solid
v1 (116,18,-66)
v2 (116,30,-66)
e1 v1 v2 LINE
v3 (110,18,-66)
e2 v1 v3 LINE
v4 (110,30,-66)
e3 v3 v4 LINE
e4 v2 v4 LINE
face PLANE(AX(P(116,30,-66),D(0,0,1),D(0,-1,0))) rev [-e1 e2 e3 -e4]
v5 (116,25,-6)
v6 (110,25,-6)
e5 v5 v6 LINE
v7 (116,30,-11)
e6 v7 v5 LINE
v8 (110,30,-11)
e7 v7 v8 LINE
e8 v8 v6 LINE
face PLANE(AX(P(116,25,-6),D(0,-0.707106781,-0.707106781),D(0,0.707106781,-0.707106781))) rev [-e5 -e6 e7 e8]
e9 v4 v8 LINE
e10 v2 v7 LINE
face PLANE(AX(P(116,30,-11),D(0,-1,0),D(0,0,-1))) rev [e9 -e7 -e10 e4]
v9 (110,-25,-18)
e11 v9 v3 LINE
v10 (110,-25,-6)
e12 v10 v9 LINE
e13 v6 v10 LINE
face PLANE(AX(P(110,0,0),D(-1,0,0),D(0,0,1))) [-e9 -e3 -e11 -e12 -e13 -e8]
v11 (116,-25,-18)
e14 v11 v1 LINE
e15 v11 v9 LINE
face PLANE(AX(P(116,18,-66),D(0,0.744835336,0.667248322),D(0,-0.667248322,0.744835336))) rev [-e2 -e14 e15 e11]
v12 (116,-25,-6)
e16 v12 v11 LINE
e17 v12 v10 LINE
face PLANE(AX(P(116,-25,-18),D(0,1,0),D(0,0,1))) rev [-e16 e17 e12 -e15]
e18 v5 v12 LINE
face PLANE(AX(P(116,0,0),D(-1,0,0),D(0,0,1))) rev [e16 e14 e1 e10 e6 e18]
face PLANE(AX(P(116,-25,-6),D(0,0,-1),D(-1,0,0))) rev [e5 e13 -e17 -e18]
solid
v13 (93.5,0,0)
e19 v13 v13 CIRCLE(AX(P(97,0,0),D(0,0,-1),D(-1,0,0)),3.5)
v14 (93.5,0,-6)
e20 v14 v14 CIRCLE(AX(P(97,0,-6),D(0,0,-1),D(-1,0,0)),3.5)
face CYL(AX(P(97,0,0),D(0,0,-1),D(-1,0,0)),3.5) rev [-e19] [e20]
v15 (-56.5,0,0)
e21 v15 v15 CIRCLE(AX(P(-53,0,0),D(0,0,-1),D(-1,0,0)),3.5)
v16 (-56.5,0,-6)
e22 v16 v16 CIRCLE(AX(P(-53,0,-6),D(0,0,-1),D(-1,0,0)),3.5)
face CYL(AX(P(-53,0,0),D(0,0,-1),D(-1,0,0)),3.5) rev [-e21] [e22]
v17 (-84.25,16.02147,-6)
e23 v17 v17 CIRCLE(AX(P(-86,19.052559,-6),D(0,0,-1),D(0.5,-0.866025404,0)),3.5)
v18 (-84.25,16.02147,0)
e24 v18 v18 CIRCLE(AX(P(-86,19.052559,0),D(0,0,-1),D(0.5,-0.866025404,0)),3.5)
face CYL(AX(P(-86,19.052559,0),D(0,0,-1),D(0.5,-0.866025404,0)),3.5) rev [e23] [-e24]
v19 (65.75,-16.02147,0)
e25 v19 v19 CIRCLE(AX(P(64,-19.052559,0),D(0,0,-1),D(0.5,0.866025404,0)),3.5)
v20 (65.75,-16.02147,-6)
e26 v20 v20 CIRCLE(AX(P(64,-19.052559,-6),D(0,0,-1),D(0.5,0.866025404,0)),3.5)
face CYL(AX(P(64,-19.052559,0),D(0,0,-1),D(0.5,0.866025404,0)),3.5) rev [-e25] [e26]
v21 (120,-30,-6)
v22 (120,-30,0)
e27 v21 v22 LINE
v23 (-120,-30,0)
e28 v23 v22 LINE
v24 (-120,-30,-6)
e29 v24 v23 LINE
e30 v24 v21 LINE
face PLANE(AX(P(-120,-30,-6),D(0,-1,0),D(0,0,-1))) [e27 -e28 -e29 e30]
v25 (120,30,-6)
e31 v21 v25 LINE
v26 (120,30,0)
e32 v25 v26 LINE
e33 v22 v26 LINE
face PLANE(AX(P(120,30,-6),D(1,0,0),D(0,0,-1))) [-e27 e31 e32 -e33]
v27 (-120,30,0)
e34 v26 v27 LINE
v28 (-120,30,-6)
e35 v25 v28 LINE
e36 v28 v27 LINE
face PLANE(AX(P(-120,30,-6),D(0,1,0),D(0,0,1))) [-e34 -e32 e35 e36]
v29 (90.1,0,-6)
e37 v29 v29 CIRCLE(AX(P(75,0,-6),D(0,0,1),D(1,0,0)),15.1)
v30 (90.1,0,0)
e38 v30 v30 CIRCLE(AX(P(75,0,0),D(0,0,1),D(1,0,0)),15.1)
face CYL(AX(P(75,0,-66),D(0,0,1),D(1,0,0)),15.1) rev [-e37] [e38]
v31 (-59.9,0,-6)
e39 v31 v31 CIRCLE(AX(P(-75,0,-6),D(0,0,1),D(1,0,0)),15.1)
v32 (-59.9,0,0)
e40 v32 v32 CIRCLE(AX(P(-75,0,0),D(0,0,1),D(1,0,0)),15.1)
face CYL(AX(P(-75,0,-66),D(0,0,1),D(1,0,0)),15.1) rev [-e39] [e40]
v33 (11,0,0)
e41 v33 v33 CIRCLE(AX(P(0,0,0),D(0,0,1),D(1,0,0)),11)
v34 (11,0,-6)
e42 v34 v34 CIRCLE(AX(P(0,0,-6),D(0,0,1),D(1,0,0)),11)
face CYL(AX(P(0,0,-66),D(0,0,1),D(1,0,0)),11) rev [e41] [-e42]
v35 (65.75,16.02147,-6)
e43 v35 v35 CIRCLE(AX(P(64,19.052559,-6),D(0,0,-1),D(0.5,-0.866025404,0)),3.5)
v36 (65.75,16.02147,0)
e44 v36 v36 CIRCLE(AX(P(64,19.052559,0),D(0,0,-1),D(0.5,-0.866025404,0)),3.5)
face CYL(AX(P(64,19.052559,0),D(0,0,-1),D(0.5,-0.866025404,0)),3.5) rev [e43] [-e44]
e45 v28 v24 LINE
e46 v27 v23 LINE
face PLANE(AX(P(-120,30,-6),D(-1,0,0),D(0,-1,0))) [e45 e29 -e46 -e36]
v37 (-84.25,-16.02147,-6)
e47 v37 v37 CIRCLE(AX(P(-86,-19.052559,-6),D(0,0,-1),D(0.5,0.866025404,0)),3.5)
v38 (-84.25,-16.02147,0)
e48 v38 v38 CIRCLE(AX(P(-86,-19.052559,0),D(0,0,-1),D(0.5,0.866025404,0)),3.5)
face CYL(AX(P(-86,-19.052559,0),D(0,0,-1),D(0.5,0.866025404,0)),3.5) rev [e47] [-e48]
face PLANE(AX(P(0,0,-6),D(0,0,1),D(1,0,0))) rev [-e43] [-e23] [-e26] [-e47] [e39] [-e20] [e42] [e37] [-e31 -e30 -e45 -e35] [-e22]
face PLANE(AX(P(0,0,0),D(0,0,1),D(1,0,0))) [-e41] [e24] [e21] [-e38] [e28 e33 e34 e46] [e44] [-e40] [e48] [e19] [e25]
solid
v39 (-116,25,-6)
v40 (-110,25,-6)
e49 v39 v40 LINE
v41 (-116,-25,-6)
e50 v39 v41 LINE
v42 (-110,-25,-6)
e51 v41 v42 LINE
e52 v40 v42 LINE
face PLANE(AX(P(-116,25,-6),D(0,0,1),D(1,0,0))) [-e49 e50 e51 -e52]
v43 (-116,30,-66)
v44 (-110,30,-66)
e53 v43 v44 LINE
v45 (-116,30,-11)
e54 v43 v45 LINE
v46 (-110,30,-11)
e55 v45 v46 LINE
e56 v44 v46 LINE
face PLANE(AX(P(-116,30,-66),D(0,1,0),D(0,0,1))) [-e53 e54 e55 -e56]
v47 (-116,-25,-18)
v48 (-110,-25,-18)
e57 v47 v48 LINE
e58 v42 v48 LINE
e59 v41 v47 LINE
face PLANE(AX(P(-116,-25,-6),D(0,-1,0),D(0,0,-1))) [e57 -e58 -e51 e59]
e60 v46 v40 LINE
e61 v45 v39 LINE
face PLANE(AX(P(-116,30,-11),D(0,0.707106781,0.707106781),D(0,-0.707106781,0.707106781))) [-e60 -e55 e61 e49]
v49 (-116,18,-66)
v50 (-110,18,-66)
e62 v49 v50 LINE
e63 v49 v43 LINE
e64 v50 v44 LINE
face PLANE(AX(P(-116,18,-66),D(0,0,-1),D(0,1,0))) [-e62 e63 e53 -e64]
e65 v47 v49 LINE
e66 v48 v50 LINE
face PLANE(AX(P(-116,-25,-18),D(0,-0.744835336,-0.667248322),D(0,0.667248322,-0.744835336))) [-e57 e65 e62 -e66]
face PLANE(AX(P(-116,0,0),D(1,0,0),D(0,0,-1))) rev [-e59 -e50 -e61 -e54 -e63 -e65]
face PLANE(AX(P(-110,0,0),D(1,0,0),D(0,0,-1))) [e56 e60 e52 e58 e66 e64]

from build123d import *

# Parameters (mm, degrees)
SKETCH1_W          = 240
SKETCH1_H          = 60
BASE_FLANGE1_DEPTH = 6
BASE_FLANGE2_DEPTH = 6
BASE_FLANGE3_DEPTH = 6
SKETCH12_R         = 11
CUT_EXTRUDE1_DEPTH = 141.199857347
SKETCH13_R         = 15.1
CUT_EXTRUDE2_DEPTH = 141.199857347
SKETCH14_R         = 3.5
CUT_EXTRUDE3_DEPTH = 138.477270849
CIRPATTERN1_COUNT  = 3
SKETCH15_R         = 3.5
CUT_EXTRUDE4_DEPTH = 138.477270849
CIRPATTERN2_COUNT  = 3


# Sheet-metal steps are written as plain solids
with BuildPart() as part:
    # Sketch1 → Base-Flange1 (new body)
    with BuildSketch(Plane.XY):
        Rectangle(SKETCH1_W, SKETCH1_H)
    extrude(amount=-BASE_FLANGE1_DEPTH)

    # Sketch12 → Cut-Extrude1 (cut, through all)
    with BuildSketch(Plane.XY):
        Circle(SKETCH12_R)
    extrude(amount=-CUT_EXTRUDE1_DEPTH, mode=Mode.SUBTRACT)

    # Sketch13 → Cut-Extrude2 (cut, through all)
    with BuildSketch(Plane.XY):
        with Locations((-75, 0)):
            Circle(SKETCH13_R)
        with Locations((75, 0)):
            Circle(SKETCH13_R)
    extrude(amount=-CUT_EXTRUDE2_DEPTH, mode=Mode.SUBTRACT)

    # Sketch14 → Cut-Extrude3 (cut, through all)
    with BuildSketch(Plane(origin=(0, 0, -6), x_dir=(-1, 0, 0), z_dir=(0, 0, -1))):
        with Locations((-97, 0)):
            Circle(SKETCH14_R)
    cut_extrude3 = extrude(amount=-CUT_EXTRUDE3_DEPTH, mode=Mode.SUBTRACT)

    # CirPattern1: Cut-Extrude3 ×3 about axis
    cirpattern1_axis = Axis((75, 0, 0), (0, 0, 1))
    for i in range(1, CIRPATTERN1_COUNT):
        add(cut_extrude3.rotate(cirpattern1_axis, i * 360 / CIRPATTERN1_COUNT), mode=Mode.SUBTRACT)

    # Sketch15 → Cut-Extrude4 (cut, through all)
    with BuildSketch(Plane(origin=(0, 0, -6), x_dir=(-1, 0, 0), z_dir=(0, 0, -1))):
        with Locations((53, 0)):
            Circle(SKETCH15_R)
    cut_extrude4 = extrude(amount=-CUT_EXTRUDE4_DEPTH, mode=Mode.SUBTRACT)

    # CirPattern2: Cut-Extrude4 ×3 about axis
    cirpattern2_axis = Axis((-75, 0, 0), (0, 0, 1))
    for i in range(1, CIRPATTERN2_COUNT):
        add(cut_extrude4.rotate(cirpattern2_axis, i * 360 / CIRPATTERN2_COUNT), mode=Mode.SUBTRACT)


with BuildPart() as body_2:
    # Sketch6 → Base-Flange2 (new body)
    with BuildSketch(Plane(origin=(110, 0, 0), x_dir=(0, 0, -1), z_dir=(1, 0, 0))):
        Polygon((11, 30), (66, 30), (66, 18), (18, -25), (6, -25), (6, 25), align=None)
    extrude(amount=BASE_FLANGE2_DEPTH)


with BuildPart() as body_3:
    # Sketch9 → Base-Flange3 (new body)
    with BuildSketch(Plane(origin=(-110, 0, 0), x_dir=(0, 0, -1), z_dir=(1, 0, 0))):
        Polygon((66, 30), (11, 30), (6, 25), (6, -25), (18, -25), (66, 18), align=None)
    extrude(amount=-BASE_FLANGE3_DEPTH)


solid = Compound([part.part, body_2.part, body_3.part])
